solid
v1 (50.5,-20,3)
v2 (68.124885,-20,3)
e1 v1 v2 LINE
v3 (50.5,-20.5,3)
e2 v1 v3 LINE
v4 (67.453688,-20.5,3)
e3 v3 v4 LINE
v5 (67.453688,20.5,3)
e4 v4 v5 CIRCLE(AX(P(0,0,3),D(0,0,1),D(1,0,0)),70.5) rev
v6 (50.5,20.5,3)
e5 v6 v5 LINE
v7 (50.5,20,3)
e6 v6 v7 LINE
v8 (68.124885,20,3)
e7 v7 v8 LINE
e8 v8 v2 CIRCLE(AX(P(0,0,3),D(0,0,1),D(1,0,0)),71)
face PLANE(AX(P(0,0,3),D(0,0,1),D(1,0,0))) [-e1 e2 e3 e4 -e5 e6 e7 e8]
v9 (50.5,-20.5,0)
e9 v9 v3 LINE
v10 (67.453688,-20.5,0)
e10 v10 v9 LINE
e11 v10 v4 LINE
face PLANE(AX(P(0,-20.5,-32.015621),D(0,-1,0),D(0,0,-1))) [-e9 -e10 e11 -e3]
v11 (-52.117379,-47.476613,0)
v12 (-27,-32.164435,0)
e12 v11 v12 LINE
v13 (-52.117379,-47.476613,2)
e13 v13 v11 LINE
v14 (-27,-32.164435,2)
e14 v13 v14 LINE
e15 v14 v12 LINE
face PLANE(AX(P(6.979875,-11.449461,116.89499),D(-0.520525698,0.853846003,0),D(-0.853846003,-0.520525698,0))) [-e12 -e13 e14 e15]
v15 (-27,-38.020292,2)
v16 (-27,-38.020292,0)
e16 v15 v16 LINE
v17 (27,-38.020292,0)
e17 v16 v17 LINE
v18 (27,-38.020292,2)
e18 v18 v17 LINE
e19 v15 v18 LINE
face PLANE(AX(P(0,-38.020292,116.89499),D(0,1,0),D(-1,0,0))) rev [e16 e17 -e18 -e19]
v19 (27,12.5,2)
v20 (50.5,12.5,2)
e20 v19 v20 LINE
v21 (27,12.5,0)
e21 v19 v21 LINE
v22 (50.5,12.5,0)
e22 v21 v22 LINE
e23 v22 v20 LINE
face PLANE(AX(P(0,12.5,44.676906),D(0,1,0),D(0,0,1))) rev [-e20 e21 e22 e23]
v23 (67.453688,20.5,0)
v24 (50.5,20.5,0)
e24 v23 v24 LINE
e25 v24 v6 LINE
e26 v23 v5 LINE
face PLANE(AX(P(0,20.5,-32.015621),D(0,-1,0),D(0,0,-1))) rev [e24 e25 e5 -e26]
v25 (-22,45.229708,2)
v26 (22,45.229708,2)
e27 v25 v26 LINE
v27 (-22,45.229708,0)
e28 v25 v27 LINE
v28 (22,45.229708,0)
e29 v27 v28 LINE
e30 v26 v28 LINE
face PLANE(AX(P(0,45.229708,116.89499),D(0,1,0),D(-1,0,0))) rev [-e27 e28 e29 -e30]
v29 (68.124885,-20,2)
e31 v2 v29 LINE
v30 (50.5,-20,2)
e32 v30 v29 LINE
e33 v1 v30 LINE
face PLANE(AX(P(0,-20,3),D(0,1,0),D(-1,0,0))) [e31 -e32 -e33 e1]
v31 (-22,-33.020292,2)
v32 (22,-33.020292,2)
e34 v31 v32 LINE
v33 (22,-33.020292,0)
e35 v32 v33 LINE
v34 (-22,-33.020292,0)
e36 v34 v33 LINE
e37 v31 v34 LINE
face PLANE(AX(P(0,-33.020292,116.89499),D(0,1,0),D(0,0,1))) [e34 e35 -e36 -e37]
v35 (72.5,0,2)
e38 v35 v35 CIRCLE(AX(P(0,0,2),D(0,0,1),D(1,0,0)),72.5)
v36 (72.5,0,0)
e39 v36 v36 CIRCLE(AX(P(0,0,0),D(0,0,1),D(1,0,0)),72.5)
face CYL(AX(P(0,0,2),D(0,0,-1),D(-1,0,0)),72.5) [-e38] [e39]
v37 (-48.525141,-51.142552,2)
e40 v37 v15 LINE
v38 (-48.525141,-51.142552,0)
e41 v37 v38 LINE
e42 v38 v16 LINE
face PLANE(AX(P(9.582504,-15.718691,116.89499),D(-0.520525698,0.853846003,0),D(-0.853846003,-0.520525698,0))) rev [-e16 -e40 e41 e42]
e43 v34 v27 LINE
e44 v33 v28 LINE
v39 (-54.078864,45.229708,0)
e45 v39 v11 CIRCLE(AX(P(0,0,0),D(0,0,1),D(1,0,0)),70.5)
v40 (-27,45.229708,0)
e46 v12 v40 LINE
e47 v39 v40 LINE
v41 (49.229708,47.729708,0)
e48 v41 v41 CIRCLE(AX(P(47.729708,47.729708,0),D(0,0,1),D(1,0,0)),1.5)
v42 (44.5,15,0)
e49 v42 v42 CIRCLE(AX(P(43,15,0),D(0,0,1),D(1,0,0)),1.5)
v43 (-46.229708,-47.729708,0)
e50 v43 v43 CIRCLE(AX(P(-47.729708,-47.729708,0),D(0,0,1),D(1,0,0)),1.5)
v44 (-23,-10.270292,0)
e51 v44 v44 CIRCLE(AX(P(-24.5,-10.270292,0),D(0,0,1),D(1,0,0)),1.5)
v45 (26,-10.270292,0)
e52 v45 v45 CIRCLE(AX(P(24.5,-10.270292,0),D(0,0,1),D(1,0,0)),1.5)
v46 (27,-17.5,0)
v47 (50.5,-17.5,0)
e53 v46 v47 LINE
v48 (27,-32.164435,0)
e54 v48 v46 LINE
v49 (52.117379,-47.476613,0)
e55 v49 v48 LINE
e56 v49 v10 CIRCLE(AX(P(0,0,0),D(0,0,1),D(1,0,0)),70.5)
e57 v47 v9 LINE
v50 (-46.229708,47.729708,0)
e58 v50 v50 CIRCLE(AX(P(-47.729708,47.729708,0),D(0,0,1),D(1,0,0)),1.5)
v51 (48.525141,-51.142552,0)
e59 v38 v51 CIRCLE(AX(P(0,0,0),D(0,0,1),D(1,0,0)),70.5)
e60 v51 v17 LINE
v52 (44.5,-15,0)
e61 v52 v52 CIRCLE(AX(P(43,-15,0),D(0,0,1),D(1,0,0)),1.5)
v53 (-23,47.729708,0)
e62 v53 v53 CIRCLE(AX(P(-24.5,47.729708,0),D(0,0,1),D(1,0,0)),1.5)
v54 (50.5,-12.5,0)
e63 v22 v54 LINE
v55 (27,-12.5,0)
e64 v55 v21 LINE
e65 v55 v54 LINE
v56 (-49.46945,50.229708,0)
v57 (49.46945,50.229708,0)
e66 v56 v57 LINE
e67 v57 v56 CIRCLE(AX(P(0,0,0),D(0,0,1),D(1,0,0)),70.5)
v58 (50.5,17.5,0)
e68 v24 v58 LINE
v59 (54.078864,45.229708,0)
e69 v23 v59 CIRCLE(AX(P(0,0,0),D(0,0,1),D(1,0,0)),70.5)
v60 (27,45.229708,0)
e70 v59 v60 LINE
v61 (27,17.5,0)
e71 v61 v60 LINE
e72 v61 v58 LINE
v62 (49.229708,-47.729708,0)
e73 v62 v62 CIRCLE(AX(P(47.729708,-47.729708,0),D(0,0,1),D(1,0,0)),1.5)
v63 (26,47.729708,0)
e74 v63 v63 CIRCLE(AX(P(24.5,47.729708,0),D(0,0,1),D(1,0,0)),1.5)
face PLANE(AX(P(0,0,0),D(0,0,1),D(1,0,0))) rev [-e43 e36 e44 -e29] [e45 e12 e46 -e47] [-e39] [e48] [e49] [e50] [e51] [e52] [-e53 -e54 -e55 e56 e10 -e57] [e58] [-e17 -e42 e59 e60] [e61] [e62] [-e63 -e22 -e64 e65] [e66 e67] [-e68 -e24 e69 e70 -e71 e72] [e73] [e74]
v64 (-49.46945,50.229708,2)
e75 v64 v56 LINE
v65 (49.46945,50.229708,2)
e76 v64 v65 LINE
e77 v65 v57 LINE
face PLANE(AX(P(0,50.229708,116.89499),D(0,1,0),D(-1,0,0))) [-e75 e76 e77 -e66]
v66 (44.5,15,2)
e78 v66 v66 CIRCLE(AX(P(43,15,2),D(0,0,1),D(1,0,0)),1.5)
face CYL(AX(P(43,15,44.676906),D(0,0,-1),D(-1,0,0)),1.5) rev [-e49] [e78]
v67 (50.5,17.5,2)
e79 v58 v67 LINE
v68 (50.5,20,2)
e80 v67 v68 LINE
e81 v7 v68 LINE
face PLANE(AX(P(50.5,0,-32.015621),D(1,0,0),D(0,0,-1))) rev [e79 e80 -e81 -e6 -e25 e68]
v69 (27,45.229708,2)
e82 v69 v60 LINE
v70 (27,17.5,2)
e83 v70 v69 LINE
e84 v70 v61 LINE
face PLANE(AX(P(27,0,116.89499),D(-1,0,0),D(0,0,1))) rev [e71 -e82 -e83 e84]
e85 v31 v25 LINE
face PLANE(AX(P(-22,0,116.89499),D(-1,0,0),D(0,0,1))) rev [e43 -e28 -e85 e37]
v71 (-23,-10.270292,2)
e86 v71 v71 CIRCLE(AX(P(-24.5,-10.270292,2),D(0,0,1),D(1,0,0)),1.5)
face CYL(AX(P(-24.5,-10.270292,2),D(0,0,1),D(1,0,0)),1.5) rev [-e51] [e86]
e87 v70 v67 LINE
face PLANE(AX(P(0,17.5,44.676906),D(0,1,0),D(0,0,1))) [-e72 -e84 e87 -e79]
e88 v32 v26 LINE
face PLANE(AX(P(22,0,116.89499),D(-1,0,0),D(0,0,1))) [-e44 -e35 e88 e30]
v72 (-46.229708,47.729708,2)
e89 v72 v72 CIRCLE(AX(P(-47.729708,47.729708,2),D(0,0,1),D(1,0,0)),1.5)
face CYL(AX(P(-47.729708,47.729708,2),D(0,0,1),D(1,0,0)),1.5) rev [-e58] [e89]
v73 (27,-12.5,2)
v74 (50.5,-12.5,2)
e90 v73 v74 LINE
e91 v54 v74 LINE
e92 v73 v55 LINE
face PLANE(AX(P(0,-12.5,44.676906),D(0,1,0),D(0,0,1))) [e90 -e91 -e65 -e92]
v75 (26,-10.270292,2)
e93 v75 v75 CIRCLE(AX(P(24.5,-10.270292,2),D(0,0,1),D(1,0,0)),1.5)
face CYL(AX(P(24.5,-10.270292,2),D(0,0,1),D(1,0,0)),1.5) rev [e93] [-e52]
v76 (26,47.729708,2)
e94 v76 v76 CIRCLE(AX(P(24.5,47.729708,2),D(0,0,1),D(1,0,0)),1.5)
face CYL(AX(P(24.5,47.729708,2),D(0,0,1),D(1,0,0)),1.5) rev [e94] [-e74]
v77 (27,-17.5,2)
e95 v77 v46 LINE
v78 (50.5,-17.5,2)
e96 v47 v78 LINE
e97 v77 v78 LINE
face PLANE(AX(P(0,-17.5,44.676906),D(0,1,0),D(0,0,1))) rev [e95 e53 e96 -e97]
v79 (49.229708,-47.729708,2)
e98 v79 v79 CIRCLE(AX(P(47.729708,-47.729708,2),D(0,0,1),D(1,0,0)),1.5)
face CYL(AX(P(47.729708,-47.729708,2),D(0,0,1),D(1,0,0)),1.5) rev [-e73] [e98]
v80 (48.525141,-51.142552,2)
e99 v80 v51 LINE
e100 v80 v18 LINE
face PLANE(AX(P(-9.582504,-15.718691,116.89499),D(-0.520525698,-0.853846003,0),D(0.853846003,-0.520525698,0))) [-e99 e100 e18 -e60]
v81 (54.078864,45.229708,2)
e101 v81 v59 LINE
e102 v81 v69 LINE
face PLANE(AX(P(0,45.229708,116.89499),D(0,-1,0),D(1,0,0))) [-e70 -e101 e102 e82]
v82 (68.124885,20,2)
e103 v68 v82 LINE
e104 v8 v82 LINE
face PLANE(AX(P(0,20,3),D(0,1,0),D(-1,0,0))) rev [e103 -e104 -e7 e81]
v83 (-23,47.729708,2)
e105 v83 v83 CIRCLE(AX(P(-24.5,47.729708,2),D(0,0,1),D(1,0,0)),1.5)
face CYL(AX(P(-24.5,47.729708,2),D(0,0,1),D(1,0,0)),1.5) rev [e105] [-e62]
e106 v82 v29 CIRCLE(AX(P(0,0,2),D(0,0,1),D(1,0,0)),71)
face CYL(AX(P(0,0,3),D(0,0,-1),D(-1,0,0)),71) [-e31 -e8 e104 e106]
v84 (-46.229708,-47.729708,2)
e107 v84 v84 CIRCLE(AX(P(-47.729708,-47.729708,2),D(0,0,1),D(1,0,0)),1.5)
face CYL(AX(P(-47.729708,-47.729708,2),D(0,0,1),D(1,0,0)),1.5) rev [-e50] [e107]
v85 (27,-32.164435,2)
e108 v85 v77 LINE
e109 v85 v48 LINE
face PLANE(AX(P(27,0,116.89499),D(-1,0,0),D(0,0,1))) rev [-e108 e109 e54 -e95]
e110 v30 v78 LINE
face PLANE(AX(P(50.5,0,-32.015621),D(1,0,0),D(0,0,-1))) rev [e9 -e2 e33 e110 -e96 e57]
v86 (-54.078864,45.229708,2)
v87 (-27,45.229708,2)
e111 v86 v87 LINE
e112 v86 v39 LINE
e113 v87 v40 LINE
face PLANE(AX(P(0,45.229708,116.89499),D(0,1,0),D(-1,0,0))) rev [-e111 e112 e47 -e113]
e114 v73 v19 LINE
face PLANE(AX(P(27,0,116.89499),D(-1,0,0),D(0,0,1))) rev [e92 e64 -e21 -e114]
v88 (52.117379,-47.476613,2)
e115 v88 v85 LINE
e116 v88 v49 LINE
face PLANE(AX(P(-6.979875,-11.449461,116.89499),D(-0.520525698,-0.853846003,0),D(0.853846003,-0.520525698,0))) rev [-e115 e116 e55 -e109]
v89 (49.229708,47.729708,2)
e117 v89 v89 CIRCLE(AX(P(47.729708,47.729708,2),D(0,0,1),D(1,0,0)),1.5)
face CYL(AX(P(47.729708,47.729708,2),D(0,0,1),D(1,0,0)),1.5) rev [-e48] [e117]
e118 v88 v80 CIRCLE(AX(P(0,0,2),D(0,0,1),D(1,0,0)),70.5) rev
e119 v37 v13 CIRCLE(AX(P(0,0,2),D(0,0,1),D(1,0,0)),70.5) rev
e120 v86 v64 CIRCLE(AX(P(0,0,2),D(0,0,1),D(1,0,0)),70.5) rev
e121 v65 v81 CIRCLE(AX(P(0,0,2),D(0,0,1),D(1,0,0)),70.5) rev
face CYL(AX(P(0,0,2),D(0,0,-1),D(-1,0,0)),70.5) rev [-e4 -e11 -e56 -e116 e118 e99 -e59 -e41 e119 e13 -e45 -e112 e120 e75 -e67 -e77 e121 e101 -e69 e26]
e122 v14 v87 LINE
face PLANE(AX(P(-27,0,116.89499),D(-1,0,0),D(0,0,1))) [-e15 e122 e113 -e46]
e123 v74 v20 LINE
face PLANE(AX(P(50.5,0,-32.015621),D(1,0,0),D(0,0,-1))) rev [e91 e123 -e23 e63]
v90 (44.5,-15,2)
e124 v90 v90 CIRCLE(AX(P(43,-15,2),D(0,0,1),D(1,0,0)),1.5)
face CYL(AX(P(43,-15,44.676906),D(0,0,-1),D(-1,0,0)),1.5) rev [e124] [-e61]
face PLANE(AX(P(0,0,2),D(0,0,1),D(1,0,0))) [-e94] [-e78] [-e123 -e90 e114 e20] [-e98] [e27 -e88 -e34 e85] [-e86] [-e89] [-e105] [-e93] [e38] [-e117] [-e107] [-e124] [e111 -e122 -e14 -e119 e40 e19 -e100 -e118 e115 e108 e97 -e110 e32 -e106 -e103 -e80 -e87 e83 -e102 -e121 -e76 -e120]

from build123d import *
from build123d.topology import SkipClean

# Parameters (mm, degrees)
SKIZZE1_R             = 72.5
SKIZZE1_R_2           = 70.5
BASE_RING_DEPTH       = 2
RASPBERRY_FRAME_DEPTH = 2
SCREWS_I_D            = 3
SKIZZE6_R             = 1.5
CAMERA_BEAM_DEPTH     = 2
BOTTOM_START          = -2
BOTTOM_COVER_DEPTH    = 2
INNER_RING_DEPTH      = 1


with BuildPart() as part:
    # Skizze1 → Base Ring (new body)
    with BuildSketch(Plane.XY):
        Circle(SKIZZE1_R)
        Circle(SKIZZE1_R_2, mode=Mode.SUBTRACT)
    extrude(amount=BASE_RING_DEPTH)

    # Skizze2 → Raspberry Frame (add)
    with BuildSketch(Plane.XY):
        with BuildLine():
            Line((0, 50.22970773), (-49.469449778, 50.22970773))
            ThreePointArc((-49.469449778, 50.22970773), (-51.834480078, 47.785318614), (-54.078864066, 45.22970773))
            Line((-54.078864066, 45.22970773), (-27, 45.22970773))
            Line((-27, 45.22970773), (-22, 45.22970773))
            Line((-22, 45.22970773), (0, 45.22970773))
            Line((0, 45.22970773), (0, 50.22970773))
        make_face()
        Polygon((-22, 45.22970773), (-27, 45.22970773), (-27, -32.164435383), (-27, -33.02029227), (-22, -33.02029227), align=None)
        with BuildLine():
            Line((-27, -32.164435383), (-52.117379441, -47.476612771))
            ThreePointArc((-52.117379441, -47.476612771), (-50.354632641, -49.34228381), (-48.5251414, -51.142552264))
            Line((-48.5251414, -51.142552264), (-27, -38.02029227))
            Line((-27, -38.02029227), (-27, -33.02029227))
            Line((-27, -33.02029227), (-27, -32.164435383))
        make_face()
        Polygon((-27, -33.02029227), (-27, -38.02029227), (0, -38.02029227), (0, -33.02029227), (-22, -33.02029227), align=None)
    raspberry_frame = extrude(amount=RASPBERRY_FRAME_DEPTH)

    # Screws I (through all)
    with Locations(Plane.XY.offset(2)):
        with Locations((-47.72970773, -47.72970773), (-24.5, -10.27029227), (-47.72970773, 47.72970773), (-24.5, 47.72970773)):
            screws_i = Hole(SCREWS_I_D / 2)

    # Mirror I: Raspberry Frame, Screws I across plane
    add(raspberry_frame.mirror(Plane(origin=(0, 0, 0), x_dir=(0, 0, 1), z_dir=(1, 0, 0))))
    add(screws_i.mirror(Plane(origin=(0, 0, 0), x_dir=(0, 0, 1), z_dir=(1, 0, 0))), mode=Mode.SUBTRACT)

    # Skizze6 → Camera Beam (add)
    # profile 1 of 2: a face of its own
    with BuildSketch(Plane.XY):
        with BuildLine():
            Line((68.293484316, 17.5), (27, 17.5))
            Line((27, 17.5), (27, 12.5))
            Line((27, 12.5), (69.382995035, 12.5))
            ThreePointArc((69.382995035, 12.5), (68.883620997, 15.009888687), (68.293484316, 17.5))
        make_face()
        with Locations((43, 15)):
            Circle(SKIZZE6_R, mode=Mode.SUBTRACT)
    # profile 2 of 2: a face of its own
    with BuildSketch(Plane.XY):
        with BuildLine():
            ThreePointArc((68.293484316, -17.5), (68.883620997, -15.009888687), (69.382995035, -12.5))
            Line((69.382995035, -12.5), (27, -12.5))
            Line((27, -12.5), (27, -17.5))
            Line((27, -17.5), (68.293484316, -17.5))
        make_face()
        with Locations((43, -15)):
            Circle(SKIZZE6_R, mode=Mode.SUBTRACT)
    extrude(amount=CAMERA_BEAM_DEPTH)

    # Skizze7 → Bottom Cover (add)
    with BuildSketch(Plane.XY.offset(2).offset(BOTTOM_START)):
        with BuildLine():
            Line((50.5, 12.5), (50.5, -12.5))
            Line((50.5, -12.5), (69.382995035, -12.5))
            ThreePointArc((69.382995035, -12.5), (70.220193496, -6.274904407), (70.5, -4.7e-08))
            ThreePointArc((70.5, -4.7e-08), (70.220193501, 6.27490436), (69.382995035, 12.5))
            Line((69.382995035, 12.5), (50.5, 12.5))
        make_face()
        with BuildLine():
            Line((50.5, 20.5), (50.5, 17.5))
            Line((50.5, 17.5), (68.293484316, 17.5))
            ThreePointArc((68.293484316, 17.5), (67.890158974, 19.00463929), (67.453687816, 20.5))
            Line((67.453687816, 20.5), (50.5, 20.5))
        make_face()
        with BuildLine():
            Line((50.5, -17.5), (50.5, -20.5))
            Line((50.5, -20.5), (67.453687816, -20.5))
            ThreePointArc((67.453687816, -20.5), (67.890158974, -19.00463929), (68.293484316, -17.5))
            Line((68.293484316, -17.5), (50.5, -17.5))
        make_face()
    extrude(amount=BOTTOM_COVER_DEPTH)

    # Skizze8 → Inner Ring (add)
    with SkipClean():  # the faces are left unmerged after this step: merging them gives an invalid solid
        with BuildSketch(Plane.XY.offset(2)):
            with BuildLine():
                Line((50.5, -20), (50.5, -20.5))
                Line((50.5, -20.5), (67.453687816, -20.5))
                ThreePointArc((67.453687816, -20.5), (-70.5, 0), (67.453687816, 20.5))
                Line((67.453687816, 20.5), (50.5, 20.5))
                Line((50.5, 20.5), (50.5, 20))
                Line((50.5, 20), (68.124885321, 20))
                ThreePointArc((68.124885321, 20), (-71, 0), (68.124885321, -20))
                Line((68.124885321, -20), (50.5, -20))
            make_face()
        extrude(amount=INNER_RING_DEPTH)


solid = part.part
